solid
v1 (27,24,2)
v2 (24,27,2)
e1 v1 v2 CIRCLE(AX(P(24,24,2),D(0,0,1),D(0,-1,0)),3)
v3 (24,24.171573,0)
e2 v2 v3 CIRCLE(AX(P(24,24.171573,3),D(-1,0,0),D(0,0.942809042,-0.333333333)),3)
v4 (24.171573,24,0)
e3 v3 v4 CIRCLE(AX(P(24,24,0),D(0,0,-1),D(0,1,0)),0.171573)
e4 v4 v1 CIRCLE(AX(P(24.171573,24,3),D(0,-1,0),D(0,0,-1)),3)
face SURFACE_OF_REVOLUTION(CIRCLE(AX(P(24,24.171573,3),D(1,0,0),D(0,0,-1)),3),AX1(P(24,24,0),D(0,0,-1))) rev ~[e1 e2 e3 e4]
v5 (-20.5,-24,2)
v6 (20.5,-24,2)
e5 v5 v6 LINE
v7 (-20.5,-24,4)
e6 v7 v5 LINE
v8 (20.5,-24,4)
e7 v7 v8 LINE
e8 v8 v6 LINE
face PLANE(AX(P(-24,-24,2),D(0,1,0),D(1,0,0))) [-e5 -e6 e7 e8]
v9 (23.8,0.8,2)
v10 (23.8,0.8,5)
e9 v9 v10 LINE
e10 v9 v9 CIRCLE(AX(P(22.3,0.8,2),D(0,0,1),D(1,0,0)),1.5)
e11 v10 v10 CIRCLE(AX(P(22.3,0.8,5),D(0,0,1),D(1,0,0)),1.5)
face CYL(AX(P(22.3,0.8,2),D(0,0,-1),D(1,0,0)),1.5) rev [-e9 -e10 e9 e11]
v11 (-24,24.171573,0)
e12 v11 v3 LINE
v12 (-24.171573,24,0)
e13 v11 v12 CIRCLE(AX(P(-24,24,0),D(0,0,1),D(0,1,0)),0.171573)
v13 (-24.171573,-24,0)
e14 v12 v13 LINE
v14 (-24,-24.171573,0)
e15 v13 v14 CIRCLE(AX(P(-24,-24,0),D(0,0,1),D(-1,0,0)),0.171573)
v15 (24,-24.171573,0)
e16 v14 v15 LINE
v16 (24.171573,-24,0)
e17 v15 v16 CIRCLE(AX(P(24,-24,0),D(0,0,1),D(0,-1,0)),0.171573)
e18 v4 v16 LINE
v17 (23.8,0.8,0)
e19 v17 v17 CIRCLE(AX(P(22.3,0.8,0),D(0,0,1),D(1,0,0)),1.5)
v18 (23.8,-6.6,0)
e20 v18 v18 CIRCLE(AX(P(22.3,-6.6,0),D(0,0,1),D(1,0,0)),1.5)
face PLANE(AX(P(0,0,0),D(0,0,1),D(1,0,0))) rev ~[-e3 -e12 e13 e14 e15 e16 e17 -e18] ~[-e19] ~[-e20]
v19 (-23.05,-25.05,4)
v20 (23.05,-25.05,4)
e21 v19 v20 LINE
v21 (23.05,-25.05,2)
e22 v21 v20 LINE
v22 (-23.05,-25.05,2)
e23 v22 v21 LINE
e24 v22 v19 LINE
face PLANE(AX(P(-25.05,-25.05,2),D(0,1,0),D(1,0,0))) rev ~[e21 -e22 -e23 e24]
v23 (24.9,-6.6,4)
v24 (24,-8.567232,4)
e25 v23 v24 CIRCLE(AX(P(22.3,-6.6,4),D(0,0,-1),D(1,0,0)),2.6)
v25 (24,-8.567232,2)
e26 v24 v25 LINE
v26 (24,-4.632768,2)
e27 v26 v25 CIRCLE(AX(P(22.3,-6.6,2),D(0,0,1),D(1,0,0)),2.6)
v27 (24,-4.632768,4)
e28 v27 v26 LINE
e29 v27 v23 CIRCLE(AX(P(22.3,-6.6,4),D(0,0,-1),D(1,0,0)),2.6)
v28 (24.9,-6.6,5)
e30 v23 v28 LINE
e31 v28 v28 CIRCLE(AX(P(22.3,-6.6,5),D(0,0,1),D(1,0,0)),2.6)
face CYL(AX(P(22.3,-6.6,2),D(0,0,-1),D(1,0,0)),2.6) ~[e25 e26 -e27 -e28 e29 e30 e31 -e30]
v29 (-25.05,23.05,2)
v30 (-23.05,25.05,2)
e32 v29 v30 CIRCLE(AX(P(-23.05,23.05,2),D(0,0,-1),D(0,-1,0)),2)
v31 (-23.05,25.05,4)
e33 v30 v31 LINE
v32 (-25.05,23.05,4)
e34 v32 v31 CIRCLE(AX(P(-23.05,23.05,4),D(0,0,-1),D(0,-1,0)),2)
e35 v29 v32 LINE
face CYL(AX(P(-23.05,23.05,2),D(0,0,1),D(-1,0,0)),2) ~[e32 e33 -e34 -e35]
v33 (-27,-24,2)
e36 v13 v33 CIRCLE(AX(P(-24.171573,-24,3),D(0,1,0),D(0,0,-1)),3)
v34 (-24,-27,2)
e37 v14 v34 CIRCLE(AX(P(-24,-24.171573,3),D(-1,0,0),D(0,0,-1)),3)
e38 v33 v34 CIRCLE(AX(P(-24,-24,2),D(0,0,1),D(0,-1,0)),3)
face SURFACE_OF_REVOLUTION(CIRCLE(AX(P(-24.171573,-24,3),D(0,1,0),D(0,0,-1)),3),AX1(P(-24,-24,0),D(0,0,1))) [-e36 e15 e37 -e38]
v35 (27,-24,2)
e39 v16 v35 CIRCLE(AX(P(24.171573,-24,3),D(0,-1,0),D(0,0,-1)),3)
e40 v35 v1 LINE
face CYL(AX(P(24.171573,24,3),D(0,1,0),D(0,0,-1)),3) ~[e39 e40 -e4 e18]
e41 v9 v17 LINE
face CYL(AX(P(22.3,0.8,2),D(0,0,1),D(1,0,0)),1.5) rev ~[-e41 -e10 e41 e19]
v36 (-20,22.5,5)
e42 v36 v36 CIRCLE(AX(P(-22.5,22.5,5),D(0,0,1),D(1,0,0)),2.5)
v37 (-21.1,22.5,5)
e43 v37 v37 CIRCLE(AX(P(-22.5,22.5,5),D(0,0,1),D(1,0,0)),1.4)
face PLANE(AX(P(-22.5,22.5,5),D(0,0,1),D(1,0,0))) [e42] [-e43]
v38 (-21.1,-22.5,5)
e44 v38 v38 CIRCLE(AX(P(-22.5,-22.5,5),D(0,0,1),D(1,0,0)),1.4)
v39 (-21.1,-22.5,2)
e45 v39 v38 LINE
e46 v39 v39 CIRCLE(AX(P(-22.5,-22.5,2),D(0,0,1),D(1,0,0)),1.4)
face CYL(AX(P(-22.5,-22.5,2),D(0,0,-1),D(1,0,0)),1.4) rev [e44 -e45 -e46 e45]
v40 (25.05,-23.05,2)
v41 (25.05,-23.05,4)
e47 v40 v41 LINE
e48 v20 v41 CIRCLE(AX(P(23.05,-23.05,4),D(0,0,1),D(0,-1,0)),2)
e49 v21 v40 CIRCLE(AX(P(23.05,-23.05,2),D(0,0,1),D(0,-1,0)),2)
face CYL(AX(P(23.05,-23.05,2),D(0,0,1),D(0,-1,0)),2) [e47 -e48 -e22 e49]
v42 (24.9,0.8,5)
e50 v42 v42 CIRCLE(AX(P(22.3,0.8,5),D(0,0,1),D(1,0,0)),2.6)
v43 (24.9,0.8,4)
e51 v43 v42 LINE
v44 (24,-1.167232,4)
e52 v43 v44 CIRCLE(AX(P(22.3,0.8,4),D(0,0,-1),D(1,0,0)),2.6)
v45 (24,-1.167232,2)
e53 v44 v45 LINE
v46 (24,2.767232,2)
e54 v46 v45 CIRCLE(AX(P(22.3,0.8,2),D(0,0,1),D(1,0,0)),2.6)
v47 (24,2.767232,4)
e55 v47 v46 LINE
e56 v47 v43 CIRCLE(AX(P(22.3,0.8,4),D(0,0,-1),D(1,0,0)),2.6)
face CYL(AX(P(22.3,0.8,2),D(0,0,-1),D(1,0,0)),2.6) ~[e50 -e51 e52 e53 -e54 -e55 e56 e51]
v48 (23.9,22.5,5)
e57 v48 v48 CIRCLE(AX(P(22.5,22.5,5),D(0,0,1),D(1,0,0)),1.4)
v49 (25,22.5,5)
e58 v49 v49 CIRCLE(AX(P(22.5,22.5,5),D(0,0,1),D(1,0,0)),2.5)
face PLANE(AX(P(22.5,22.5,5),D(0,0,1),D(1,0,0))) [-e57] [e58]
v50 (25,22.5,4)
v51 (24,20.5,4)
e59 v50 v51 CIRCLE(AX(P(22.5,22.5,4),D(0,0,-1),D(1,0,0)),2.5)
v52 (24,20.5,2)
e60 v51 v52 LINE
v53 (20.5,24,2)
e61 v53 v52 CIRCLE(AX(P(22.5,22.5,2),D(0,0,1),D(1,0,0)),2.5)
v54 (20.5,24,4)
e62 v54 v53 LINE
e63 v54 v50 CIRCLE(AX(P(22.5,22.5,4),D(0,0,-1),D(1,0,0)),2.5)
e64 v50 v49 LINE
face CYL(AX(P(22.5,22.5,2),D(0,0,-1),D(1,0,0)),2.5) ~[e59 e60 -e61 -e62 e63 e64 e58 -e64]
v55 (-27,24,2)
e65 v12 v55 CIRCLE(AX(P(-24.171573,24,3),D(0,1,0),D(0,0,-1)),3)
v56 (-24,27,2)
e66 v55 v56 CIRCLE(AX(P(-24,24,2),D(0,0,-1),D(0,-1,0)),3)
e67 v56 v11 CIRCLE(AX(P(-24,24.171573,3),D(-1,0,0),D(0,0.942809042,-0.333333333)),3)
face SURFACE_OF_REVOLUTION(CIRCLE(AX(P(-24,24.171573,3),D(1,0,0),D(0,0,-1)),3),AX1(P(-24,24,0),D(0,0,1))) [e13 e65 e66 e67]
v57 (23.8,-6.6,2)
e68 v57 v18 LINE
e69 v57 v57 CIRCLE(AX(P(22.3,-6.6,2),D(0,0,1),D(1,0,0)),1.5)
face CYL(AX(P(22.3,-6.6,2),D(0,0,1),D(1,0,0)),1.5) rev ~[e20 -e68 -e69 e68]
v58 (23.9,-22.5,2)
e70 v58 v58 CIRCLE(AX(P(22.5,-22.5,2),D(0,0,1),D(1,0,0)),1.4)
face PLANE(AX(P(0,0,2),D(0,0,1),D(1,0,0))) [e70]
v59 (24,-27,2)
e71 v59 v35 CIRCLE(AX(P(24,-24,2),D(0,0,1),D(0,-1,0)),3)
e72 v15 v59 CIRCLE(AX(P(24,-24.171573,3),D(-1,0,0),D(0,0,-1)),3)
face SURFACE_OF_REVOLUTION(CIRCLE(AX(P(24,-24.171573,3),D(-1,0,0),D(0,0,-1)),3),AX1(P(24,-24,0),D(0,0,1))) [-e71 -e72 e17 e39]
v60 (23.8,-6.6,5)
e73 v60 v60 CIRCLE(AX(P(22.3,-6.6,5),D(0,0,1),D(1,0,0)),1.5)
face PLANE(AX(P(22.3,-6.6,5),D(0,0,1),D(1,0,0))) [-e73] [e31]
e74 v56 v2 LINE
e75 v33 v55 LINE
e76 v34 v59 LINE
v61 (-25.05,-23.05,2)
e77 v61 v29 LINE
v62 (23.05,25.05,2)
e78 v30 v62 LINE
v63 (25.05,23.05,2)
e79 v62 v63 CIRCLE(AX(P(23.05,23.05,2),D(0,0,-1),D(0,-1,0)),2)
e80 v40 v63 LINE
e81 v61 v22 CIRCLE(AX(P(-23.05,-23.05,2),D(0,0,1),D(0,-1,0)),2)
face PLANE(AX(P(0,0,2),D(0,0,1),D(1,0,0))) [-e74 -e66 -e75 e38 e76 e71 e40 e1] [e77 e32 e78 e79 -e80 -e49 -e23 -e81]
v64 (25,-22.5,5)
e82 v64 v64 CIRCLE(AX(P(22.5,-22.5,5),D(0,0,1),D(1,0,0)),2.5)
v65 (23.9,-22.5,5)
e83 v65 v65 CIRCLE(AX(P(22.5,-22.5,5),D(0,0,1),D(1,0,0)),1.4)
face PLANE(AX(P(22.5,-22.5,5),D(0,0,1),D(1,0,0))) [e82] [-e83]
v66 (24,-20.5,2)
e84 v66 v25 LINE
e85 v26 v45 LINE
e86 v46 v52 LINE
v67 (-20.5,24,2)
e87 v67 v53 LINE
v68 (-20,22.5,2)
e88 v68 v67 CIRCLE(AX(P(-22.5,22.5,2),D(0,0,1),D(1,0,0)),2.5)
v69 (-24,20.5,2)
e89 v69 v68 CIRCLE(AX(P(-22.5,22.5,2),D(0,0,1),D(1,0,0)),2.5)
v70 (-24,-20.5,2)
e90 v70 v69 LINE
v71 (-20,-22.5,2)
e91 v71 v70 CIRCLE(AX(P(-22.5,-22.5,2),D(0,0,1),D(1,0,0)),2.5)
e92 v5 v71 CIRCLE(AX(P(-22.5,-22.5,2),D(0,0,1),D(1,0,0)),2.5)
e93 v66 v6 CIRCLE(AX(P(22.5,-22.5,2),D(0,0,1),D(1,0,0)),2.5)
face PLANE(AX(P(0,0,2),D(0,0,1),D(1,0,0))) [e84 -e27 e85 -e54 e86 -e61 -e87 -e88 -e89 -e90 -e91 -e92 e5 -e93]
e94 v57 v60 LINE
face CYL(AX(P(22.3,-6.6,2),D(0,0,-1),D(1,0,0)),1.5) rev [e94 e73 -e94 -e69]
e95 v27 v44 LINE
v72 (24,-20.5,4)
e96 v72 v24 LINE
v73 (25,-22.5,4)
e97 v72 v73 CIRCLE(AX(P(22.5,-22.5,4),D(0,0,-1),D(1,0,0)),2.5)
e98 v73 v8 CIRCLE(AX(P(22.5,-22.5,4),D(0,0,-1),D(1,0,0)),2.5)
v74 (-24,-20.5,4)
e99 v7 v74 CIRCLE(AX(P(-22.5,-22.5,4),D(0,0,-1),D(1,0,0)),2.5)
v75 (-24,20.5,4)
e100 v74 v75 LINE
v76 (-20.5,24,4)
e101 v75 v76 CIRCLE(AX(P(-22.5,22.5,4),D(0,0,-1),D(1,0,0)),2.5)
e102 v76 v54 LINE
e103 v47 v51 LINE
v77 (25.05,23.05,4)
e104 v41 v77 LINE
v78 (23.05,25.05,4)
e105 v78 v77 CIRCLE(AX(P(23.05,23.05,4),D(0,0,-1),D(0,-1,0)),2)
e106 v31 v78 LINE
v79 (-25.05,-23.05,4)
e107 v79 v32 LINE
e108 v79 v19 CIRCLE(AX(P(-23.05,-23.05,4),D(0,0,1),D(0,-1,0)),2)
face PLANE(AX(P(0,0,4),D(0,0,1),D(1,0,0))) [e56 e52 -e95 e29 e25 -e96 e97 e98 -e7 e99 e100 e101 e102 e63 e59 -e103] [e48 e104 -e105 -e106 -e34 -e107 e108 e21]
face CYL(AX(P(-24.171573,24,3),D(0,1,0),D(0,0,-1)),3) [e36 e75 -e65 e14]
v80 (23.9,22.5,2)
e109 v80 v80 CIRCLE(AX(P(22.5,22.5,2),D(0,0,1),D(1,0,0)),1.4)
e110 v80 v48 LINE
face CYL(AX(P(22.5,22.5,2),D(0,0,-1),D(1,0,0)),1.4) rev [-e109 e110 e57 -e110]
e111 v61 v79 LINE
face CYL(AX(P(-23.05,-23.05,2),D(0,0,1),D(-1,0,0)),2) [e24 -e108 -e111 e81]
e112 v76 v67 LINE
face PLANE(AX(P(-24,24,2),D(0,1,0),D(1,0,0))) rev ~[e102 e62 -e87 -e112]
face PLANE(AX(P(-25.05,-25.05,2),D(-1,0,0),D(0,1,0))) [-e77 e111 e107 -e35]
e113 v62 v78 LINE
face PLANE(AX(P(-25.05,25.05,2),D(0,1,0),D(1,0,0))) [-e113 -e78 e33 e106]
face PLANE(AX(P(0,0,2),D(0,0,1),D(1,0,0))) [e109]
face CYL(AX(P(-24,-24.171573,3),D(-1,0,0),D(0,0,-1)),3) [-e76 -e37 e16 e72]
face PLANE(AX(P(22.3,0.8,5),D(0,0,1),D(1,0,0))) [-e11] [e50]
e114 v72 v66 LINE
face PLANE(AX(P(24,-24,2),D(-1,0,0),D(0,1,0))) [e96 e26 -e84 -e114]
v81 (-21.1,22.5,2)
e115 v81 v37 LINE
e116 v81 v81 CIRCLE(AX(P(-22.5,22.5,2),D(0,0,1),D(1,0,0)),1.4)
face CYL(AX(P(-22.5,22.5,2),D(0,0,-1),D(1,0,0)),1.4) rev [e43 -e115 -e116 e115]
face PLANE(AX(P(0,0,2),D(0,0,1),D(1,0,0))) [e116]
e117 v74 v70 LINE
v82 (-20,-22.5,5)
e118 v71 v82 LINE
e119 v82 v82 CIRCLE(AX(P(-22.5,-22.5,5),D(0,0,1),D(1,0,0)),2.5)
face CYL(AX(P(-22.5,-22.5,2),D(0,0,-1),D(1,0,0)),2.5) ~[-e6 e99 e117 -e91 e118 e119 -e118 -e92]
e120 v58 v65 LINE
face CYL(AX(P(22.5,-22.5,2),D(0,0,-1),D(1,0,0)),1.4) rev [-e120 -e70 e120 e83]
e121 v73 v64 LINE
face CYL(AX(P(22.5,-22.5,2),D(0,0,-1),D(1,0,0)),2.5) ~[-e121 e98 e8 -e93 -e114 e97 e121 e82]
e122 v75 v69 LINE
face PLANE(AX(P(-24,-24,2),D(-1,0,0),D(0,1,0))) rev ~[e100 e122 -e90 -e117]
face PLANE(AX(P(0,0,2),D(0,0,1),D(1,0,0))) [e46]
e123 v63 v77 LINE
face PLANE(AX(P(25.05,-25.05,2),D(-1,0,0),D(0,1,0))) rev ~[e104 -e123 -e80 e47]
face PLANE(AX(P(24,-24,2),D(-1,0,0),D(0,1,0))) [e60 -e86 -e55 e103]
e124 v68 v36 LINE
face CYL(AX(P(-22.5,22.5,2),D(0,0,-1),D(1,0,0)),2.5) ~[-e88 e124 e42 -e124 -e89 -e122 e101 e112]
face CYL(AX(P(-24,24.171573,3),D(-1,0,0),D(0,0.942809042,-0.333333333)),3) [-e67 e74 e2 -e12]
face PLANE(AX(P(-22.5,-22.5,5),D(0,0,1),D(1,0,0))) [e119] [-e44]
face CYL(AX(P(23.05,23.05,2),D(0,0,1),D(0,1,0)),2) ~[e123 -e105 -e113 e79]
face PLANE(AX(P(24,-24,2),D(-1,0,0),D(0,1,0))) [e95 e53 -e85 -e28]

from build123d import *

# Parameters (mm, degrees)
F0_W         = 54
F0_H         = 54
F1_DEPTH     = 2
F2_R         = 3
F3_T1_DEPTH  = 48
F3_T3_DEPTH  = 48
F3_T6_ANGLE  = 90
F3_T8_ANGLE  = 90
F3_T10_ANGLE = 90
F3_T12_ANGLE = 90
F4_W         = 50.1
F4_H         = 50.1
F4_W_2       = 48
F4_H_2       = 48
F5_DEPTH     = 2
F6_R         = 2.5
F6_R_2       = 1.4
F7_DEPTH     = 3
F8_R         = 2
F9_R         = 2.6
F9_R_2       = 1.5
F10_DEPTH    = 3
F11_R        = 1.5
F12_DEPTH    = 25


# Not quite as in the source:
# - a fillet or chamfer that OpenCascade refuses, or shapes differently, is made with other operations: its cross-section is extruded or revolved along the edge and cut away or added


with BuildPart() as f1:
    # F0 (on Top) → F1 (new body)
    with BuildSketch(Plane.XY):
        Rectangle(F0_W, F0_H)
    extrude(amount=F1_DEPTH)

    # F2
    f2_edges = [f1.edges().sort_by_distance(p)[0] for p in [
        (-27, -27, 1),
        (-27, 27, 1),
        (27, 27, 1),
        (27, -27, 1),
    ]]
    fillet(f2_edges, radius=F2_R)

    # F3: fillet of radius 3 on 8 edges, made by hand

    # F3_s2 → F3_t1 (cut)
    with BuildSketch(Plane.YZ.offset(-24)):
        with BuildLine():
            ThreePointArc((27, 2), (25.9036236828, 0.5505102572), (24.1715728753, 0))
            Line((24.1715728753, 0), (27, 0))
            Line((27, 0), (27, 2))
        make_face()
        with BuildLine():
            ThreePointArc((-24.1715728753, 0), (-25.9036236828, 0.5505102572), (-27, 2))
            Line((-27, 2), (-27, 0))
            Line((-27, 0), (-24.1715728753, 0))
        make_face()
    extrude(amount=F3_T1_DEPTH, mode=Mode.SUBTRACT)

    # F3_s4 → F3_t3 (cut)
    with BuildSketch(Plane.XZ.offset(-24)):
        with BuildLine():
            ThreePointArc((24.1715728753, 0), (25.9036236828, 0.5505102572), (27, 2))
            Line((27, 2), (27, 0))
            Line((27, 0), (24.1715728753, 0))
        make_face()
        with BuildLine():
            ThreePointArc((-24.1715728753, 0), (-25.9036236828, 0.5505102572), (-27, 2))
            Line((-27, 2), (-27, 0))
            Line((-27, 0), (-24.1715728753, 0))
        make_face()
    extrude(amount=F3_T3_DEPTH, mode=Mode.SUBTRACT)

    # F3_s5 → F3_t6 (revolve, cut)
    with BuildSketch(Plane.YZ.offset(24)):
        with BuildLine():
            ThreePointArc((24.1715728753, 0), (25.9036236828, 0.5505102572), (27, 2))
            Line((27, 2), (27, 0))
            Line((27, 0), (24.1715728753, 0))
        make_face()
    revolve(axis=Axis((24, 24, 0), (0, 0, -1)), revolution_arc=F3_T6_ANGLE, mode=Mode.SUBTRACT)

    # F3_s7 → F3_t8 (revolve, cut)
    with BuildSketch(Plane.YZ.offset(-24)):
        with BuildLine():
            ThreePointArc((24.1715728753, 0), (25.9036236828, 0.5505102572), (27, 2))
            Line((27, 2), (27, 0))
            Line((27, 0), (24.1715728753, 0))
        make_face()
    revolve(axis=Axis((-24, 24, 0), (0, 0, 1)), revolution_arc=F3_T8_ANGLE, mode=Mode.SUBTRACT)

    # F3_s9 → F3_t10 (revolve, cut)
    with BuildSketch(Plane.YZ.offset(24)):
        with BuildLine():
            ThreePointArc((-24.1715728753, 0), (-25.9036236828, 0.5505102572), (-27, 2))
            Line((-27, 2), (-27, 0))
            Line((-27, 0), (-24.1715728753, 0))
        make_face()
    revolve(axis=Axis((24, -24, 0), (0, 0, 1)), revolution_arc=F3_T10_ANGLE, mode=Mode.SUBTRACT)

    # F3_s11 → F3_t12 (revolve, cut)
    with BuildSketch(Plane.XZ.offset(24)):
        with BuildLine():
            ThreePointArc((-24.1715728753, 0), (-25.9036236828, 0.5505102572), (-27, 2))
            Line((-27, 2), (-27, 0))
            Line((-27, 0), (-24.1715728753, 0))
        make_face()
    revolve(axis=Axis((-24, -24, 0), (0, 0, 1)), revolution_arc=F3_T12_ANGLE, mode=Mode.SUBTRACT)

    # F4 (on face) → F5 (join)
    with BuildSketch(Plane.XY.offset(2)):
        Rectangle(F4_W, F4_H)
        Rectangle(F4_W_2, F4_H_2, mode=Mode.SUBTRACT)
    extrude(amount=F5_DEPTH)

    # F6 (on face) → F7 (join)
    with BuildSketch(Plane.XY.offset(2)):
        with Locations((-22.5, 22.5)):
            Circle(F6_R)
        with Locations((-22.5, 22.5)):
            Circle(F6_R_2, mode=Mode.SUBTRACT)
        with Locations((22.5, 22.5)):
            Circle(F6_R)
        with Locations((22.5, 22.5)):
            Circle(F6_R_2, mode=Mode.SUBTRACT)
        with Locations((22.5, -22.5)):
            Circle(F6_R)
        with Locations((22.5, -22.5)):
            Circle(F6_R_2, mode=Mode.SUBTRACT)
        with Locations((-22.5, -22.5)):
            Circle(F6_R)
        with Locations((-22.5, -22.5)):
            Circle(F6_R_2, mode=Mode.SUBTRACT)
    extrude(amount=F7_DEPTH)

    # F8
    f8_edges = [f1.edges().sort_by_distance(p)[0] for p in [
        (-25.05, -25.05, 3),
        (25.05, -25.05, 3),
        (25.05, 25.05, 3),
        (-25.05, 25.05, 3),
    ]]
    fillet(f8_edges, radius=F8_R)

    # F9 (on face) → F10 (join)
    with BuildSketch(Plane.XY.offset(2)):
        with Locations((22.3, 0.8)):
            Circle(F9_R)
        with Locations((22.3, 0.8)):
            Circle(F9_R_2, mode=Mode.SUBTRACT)
        with Locations((22.3, -6.6)):
            Circle(F9_R)
        with Locations((22.3, -6.6)):
            Circle(F9_R_2, mode=Mode.SUBTRACT)
    extrude(amount=F10_DEPTH)

    # F11 (on face) → F12 (cut)
    with BuildSketch(Plane.XY.offset(2)):
        with Locations((22.3, 0.8)):
            Circle(F11_R)
        with Locations((22.3, -6.6)):
            Circle(F11_R)
    extrude(amount=-F12_DEPTH, mode=Mode.SUBTRACT)


solid = f1.part
